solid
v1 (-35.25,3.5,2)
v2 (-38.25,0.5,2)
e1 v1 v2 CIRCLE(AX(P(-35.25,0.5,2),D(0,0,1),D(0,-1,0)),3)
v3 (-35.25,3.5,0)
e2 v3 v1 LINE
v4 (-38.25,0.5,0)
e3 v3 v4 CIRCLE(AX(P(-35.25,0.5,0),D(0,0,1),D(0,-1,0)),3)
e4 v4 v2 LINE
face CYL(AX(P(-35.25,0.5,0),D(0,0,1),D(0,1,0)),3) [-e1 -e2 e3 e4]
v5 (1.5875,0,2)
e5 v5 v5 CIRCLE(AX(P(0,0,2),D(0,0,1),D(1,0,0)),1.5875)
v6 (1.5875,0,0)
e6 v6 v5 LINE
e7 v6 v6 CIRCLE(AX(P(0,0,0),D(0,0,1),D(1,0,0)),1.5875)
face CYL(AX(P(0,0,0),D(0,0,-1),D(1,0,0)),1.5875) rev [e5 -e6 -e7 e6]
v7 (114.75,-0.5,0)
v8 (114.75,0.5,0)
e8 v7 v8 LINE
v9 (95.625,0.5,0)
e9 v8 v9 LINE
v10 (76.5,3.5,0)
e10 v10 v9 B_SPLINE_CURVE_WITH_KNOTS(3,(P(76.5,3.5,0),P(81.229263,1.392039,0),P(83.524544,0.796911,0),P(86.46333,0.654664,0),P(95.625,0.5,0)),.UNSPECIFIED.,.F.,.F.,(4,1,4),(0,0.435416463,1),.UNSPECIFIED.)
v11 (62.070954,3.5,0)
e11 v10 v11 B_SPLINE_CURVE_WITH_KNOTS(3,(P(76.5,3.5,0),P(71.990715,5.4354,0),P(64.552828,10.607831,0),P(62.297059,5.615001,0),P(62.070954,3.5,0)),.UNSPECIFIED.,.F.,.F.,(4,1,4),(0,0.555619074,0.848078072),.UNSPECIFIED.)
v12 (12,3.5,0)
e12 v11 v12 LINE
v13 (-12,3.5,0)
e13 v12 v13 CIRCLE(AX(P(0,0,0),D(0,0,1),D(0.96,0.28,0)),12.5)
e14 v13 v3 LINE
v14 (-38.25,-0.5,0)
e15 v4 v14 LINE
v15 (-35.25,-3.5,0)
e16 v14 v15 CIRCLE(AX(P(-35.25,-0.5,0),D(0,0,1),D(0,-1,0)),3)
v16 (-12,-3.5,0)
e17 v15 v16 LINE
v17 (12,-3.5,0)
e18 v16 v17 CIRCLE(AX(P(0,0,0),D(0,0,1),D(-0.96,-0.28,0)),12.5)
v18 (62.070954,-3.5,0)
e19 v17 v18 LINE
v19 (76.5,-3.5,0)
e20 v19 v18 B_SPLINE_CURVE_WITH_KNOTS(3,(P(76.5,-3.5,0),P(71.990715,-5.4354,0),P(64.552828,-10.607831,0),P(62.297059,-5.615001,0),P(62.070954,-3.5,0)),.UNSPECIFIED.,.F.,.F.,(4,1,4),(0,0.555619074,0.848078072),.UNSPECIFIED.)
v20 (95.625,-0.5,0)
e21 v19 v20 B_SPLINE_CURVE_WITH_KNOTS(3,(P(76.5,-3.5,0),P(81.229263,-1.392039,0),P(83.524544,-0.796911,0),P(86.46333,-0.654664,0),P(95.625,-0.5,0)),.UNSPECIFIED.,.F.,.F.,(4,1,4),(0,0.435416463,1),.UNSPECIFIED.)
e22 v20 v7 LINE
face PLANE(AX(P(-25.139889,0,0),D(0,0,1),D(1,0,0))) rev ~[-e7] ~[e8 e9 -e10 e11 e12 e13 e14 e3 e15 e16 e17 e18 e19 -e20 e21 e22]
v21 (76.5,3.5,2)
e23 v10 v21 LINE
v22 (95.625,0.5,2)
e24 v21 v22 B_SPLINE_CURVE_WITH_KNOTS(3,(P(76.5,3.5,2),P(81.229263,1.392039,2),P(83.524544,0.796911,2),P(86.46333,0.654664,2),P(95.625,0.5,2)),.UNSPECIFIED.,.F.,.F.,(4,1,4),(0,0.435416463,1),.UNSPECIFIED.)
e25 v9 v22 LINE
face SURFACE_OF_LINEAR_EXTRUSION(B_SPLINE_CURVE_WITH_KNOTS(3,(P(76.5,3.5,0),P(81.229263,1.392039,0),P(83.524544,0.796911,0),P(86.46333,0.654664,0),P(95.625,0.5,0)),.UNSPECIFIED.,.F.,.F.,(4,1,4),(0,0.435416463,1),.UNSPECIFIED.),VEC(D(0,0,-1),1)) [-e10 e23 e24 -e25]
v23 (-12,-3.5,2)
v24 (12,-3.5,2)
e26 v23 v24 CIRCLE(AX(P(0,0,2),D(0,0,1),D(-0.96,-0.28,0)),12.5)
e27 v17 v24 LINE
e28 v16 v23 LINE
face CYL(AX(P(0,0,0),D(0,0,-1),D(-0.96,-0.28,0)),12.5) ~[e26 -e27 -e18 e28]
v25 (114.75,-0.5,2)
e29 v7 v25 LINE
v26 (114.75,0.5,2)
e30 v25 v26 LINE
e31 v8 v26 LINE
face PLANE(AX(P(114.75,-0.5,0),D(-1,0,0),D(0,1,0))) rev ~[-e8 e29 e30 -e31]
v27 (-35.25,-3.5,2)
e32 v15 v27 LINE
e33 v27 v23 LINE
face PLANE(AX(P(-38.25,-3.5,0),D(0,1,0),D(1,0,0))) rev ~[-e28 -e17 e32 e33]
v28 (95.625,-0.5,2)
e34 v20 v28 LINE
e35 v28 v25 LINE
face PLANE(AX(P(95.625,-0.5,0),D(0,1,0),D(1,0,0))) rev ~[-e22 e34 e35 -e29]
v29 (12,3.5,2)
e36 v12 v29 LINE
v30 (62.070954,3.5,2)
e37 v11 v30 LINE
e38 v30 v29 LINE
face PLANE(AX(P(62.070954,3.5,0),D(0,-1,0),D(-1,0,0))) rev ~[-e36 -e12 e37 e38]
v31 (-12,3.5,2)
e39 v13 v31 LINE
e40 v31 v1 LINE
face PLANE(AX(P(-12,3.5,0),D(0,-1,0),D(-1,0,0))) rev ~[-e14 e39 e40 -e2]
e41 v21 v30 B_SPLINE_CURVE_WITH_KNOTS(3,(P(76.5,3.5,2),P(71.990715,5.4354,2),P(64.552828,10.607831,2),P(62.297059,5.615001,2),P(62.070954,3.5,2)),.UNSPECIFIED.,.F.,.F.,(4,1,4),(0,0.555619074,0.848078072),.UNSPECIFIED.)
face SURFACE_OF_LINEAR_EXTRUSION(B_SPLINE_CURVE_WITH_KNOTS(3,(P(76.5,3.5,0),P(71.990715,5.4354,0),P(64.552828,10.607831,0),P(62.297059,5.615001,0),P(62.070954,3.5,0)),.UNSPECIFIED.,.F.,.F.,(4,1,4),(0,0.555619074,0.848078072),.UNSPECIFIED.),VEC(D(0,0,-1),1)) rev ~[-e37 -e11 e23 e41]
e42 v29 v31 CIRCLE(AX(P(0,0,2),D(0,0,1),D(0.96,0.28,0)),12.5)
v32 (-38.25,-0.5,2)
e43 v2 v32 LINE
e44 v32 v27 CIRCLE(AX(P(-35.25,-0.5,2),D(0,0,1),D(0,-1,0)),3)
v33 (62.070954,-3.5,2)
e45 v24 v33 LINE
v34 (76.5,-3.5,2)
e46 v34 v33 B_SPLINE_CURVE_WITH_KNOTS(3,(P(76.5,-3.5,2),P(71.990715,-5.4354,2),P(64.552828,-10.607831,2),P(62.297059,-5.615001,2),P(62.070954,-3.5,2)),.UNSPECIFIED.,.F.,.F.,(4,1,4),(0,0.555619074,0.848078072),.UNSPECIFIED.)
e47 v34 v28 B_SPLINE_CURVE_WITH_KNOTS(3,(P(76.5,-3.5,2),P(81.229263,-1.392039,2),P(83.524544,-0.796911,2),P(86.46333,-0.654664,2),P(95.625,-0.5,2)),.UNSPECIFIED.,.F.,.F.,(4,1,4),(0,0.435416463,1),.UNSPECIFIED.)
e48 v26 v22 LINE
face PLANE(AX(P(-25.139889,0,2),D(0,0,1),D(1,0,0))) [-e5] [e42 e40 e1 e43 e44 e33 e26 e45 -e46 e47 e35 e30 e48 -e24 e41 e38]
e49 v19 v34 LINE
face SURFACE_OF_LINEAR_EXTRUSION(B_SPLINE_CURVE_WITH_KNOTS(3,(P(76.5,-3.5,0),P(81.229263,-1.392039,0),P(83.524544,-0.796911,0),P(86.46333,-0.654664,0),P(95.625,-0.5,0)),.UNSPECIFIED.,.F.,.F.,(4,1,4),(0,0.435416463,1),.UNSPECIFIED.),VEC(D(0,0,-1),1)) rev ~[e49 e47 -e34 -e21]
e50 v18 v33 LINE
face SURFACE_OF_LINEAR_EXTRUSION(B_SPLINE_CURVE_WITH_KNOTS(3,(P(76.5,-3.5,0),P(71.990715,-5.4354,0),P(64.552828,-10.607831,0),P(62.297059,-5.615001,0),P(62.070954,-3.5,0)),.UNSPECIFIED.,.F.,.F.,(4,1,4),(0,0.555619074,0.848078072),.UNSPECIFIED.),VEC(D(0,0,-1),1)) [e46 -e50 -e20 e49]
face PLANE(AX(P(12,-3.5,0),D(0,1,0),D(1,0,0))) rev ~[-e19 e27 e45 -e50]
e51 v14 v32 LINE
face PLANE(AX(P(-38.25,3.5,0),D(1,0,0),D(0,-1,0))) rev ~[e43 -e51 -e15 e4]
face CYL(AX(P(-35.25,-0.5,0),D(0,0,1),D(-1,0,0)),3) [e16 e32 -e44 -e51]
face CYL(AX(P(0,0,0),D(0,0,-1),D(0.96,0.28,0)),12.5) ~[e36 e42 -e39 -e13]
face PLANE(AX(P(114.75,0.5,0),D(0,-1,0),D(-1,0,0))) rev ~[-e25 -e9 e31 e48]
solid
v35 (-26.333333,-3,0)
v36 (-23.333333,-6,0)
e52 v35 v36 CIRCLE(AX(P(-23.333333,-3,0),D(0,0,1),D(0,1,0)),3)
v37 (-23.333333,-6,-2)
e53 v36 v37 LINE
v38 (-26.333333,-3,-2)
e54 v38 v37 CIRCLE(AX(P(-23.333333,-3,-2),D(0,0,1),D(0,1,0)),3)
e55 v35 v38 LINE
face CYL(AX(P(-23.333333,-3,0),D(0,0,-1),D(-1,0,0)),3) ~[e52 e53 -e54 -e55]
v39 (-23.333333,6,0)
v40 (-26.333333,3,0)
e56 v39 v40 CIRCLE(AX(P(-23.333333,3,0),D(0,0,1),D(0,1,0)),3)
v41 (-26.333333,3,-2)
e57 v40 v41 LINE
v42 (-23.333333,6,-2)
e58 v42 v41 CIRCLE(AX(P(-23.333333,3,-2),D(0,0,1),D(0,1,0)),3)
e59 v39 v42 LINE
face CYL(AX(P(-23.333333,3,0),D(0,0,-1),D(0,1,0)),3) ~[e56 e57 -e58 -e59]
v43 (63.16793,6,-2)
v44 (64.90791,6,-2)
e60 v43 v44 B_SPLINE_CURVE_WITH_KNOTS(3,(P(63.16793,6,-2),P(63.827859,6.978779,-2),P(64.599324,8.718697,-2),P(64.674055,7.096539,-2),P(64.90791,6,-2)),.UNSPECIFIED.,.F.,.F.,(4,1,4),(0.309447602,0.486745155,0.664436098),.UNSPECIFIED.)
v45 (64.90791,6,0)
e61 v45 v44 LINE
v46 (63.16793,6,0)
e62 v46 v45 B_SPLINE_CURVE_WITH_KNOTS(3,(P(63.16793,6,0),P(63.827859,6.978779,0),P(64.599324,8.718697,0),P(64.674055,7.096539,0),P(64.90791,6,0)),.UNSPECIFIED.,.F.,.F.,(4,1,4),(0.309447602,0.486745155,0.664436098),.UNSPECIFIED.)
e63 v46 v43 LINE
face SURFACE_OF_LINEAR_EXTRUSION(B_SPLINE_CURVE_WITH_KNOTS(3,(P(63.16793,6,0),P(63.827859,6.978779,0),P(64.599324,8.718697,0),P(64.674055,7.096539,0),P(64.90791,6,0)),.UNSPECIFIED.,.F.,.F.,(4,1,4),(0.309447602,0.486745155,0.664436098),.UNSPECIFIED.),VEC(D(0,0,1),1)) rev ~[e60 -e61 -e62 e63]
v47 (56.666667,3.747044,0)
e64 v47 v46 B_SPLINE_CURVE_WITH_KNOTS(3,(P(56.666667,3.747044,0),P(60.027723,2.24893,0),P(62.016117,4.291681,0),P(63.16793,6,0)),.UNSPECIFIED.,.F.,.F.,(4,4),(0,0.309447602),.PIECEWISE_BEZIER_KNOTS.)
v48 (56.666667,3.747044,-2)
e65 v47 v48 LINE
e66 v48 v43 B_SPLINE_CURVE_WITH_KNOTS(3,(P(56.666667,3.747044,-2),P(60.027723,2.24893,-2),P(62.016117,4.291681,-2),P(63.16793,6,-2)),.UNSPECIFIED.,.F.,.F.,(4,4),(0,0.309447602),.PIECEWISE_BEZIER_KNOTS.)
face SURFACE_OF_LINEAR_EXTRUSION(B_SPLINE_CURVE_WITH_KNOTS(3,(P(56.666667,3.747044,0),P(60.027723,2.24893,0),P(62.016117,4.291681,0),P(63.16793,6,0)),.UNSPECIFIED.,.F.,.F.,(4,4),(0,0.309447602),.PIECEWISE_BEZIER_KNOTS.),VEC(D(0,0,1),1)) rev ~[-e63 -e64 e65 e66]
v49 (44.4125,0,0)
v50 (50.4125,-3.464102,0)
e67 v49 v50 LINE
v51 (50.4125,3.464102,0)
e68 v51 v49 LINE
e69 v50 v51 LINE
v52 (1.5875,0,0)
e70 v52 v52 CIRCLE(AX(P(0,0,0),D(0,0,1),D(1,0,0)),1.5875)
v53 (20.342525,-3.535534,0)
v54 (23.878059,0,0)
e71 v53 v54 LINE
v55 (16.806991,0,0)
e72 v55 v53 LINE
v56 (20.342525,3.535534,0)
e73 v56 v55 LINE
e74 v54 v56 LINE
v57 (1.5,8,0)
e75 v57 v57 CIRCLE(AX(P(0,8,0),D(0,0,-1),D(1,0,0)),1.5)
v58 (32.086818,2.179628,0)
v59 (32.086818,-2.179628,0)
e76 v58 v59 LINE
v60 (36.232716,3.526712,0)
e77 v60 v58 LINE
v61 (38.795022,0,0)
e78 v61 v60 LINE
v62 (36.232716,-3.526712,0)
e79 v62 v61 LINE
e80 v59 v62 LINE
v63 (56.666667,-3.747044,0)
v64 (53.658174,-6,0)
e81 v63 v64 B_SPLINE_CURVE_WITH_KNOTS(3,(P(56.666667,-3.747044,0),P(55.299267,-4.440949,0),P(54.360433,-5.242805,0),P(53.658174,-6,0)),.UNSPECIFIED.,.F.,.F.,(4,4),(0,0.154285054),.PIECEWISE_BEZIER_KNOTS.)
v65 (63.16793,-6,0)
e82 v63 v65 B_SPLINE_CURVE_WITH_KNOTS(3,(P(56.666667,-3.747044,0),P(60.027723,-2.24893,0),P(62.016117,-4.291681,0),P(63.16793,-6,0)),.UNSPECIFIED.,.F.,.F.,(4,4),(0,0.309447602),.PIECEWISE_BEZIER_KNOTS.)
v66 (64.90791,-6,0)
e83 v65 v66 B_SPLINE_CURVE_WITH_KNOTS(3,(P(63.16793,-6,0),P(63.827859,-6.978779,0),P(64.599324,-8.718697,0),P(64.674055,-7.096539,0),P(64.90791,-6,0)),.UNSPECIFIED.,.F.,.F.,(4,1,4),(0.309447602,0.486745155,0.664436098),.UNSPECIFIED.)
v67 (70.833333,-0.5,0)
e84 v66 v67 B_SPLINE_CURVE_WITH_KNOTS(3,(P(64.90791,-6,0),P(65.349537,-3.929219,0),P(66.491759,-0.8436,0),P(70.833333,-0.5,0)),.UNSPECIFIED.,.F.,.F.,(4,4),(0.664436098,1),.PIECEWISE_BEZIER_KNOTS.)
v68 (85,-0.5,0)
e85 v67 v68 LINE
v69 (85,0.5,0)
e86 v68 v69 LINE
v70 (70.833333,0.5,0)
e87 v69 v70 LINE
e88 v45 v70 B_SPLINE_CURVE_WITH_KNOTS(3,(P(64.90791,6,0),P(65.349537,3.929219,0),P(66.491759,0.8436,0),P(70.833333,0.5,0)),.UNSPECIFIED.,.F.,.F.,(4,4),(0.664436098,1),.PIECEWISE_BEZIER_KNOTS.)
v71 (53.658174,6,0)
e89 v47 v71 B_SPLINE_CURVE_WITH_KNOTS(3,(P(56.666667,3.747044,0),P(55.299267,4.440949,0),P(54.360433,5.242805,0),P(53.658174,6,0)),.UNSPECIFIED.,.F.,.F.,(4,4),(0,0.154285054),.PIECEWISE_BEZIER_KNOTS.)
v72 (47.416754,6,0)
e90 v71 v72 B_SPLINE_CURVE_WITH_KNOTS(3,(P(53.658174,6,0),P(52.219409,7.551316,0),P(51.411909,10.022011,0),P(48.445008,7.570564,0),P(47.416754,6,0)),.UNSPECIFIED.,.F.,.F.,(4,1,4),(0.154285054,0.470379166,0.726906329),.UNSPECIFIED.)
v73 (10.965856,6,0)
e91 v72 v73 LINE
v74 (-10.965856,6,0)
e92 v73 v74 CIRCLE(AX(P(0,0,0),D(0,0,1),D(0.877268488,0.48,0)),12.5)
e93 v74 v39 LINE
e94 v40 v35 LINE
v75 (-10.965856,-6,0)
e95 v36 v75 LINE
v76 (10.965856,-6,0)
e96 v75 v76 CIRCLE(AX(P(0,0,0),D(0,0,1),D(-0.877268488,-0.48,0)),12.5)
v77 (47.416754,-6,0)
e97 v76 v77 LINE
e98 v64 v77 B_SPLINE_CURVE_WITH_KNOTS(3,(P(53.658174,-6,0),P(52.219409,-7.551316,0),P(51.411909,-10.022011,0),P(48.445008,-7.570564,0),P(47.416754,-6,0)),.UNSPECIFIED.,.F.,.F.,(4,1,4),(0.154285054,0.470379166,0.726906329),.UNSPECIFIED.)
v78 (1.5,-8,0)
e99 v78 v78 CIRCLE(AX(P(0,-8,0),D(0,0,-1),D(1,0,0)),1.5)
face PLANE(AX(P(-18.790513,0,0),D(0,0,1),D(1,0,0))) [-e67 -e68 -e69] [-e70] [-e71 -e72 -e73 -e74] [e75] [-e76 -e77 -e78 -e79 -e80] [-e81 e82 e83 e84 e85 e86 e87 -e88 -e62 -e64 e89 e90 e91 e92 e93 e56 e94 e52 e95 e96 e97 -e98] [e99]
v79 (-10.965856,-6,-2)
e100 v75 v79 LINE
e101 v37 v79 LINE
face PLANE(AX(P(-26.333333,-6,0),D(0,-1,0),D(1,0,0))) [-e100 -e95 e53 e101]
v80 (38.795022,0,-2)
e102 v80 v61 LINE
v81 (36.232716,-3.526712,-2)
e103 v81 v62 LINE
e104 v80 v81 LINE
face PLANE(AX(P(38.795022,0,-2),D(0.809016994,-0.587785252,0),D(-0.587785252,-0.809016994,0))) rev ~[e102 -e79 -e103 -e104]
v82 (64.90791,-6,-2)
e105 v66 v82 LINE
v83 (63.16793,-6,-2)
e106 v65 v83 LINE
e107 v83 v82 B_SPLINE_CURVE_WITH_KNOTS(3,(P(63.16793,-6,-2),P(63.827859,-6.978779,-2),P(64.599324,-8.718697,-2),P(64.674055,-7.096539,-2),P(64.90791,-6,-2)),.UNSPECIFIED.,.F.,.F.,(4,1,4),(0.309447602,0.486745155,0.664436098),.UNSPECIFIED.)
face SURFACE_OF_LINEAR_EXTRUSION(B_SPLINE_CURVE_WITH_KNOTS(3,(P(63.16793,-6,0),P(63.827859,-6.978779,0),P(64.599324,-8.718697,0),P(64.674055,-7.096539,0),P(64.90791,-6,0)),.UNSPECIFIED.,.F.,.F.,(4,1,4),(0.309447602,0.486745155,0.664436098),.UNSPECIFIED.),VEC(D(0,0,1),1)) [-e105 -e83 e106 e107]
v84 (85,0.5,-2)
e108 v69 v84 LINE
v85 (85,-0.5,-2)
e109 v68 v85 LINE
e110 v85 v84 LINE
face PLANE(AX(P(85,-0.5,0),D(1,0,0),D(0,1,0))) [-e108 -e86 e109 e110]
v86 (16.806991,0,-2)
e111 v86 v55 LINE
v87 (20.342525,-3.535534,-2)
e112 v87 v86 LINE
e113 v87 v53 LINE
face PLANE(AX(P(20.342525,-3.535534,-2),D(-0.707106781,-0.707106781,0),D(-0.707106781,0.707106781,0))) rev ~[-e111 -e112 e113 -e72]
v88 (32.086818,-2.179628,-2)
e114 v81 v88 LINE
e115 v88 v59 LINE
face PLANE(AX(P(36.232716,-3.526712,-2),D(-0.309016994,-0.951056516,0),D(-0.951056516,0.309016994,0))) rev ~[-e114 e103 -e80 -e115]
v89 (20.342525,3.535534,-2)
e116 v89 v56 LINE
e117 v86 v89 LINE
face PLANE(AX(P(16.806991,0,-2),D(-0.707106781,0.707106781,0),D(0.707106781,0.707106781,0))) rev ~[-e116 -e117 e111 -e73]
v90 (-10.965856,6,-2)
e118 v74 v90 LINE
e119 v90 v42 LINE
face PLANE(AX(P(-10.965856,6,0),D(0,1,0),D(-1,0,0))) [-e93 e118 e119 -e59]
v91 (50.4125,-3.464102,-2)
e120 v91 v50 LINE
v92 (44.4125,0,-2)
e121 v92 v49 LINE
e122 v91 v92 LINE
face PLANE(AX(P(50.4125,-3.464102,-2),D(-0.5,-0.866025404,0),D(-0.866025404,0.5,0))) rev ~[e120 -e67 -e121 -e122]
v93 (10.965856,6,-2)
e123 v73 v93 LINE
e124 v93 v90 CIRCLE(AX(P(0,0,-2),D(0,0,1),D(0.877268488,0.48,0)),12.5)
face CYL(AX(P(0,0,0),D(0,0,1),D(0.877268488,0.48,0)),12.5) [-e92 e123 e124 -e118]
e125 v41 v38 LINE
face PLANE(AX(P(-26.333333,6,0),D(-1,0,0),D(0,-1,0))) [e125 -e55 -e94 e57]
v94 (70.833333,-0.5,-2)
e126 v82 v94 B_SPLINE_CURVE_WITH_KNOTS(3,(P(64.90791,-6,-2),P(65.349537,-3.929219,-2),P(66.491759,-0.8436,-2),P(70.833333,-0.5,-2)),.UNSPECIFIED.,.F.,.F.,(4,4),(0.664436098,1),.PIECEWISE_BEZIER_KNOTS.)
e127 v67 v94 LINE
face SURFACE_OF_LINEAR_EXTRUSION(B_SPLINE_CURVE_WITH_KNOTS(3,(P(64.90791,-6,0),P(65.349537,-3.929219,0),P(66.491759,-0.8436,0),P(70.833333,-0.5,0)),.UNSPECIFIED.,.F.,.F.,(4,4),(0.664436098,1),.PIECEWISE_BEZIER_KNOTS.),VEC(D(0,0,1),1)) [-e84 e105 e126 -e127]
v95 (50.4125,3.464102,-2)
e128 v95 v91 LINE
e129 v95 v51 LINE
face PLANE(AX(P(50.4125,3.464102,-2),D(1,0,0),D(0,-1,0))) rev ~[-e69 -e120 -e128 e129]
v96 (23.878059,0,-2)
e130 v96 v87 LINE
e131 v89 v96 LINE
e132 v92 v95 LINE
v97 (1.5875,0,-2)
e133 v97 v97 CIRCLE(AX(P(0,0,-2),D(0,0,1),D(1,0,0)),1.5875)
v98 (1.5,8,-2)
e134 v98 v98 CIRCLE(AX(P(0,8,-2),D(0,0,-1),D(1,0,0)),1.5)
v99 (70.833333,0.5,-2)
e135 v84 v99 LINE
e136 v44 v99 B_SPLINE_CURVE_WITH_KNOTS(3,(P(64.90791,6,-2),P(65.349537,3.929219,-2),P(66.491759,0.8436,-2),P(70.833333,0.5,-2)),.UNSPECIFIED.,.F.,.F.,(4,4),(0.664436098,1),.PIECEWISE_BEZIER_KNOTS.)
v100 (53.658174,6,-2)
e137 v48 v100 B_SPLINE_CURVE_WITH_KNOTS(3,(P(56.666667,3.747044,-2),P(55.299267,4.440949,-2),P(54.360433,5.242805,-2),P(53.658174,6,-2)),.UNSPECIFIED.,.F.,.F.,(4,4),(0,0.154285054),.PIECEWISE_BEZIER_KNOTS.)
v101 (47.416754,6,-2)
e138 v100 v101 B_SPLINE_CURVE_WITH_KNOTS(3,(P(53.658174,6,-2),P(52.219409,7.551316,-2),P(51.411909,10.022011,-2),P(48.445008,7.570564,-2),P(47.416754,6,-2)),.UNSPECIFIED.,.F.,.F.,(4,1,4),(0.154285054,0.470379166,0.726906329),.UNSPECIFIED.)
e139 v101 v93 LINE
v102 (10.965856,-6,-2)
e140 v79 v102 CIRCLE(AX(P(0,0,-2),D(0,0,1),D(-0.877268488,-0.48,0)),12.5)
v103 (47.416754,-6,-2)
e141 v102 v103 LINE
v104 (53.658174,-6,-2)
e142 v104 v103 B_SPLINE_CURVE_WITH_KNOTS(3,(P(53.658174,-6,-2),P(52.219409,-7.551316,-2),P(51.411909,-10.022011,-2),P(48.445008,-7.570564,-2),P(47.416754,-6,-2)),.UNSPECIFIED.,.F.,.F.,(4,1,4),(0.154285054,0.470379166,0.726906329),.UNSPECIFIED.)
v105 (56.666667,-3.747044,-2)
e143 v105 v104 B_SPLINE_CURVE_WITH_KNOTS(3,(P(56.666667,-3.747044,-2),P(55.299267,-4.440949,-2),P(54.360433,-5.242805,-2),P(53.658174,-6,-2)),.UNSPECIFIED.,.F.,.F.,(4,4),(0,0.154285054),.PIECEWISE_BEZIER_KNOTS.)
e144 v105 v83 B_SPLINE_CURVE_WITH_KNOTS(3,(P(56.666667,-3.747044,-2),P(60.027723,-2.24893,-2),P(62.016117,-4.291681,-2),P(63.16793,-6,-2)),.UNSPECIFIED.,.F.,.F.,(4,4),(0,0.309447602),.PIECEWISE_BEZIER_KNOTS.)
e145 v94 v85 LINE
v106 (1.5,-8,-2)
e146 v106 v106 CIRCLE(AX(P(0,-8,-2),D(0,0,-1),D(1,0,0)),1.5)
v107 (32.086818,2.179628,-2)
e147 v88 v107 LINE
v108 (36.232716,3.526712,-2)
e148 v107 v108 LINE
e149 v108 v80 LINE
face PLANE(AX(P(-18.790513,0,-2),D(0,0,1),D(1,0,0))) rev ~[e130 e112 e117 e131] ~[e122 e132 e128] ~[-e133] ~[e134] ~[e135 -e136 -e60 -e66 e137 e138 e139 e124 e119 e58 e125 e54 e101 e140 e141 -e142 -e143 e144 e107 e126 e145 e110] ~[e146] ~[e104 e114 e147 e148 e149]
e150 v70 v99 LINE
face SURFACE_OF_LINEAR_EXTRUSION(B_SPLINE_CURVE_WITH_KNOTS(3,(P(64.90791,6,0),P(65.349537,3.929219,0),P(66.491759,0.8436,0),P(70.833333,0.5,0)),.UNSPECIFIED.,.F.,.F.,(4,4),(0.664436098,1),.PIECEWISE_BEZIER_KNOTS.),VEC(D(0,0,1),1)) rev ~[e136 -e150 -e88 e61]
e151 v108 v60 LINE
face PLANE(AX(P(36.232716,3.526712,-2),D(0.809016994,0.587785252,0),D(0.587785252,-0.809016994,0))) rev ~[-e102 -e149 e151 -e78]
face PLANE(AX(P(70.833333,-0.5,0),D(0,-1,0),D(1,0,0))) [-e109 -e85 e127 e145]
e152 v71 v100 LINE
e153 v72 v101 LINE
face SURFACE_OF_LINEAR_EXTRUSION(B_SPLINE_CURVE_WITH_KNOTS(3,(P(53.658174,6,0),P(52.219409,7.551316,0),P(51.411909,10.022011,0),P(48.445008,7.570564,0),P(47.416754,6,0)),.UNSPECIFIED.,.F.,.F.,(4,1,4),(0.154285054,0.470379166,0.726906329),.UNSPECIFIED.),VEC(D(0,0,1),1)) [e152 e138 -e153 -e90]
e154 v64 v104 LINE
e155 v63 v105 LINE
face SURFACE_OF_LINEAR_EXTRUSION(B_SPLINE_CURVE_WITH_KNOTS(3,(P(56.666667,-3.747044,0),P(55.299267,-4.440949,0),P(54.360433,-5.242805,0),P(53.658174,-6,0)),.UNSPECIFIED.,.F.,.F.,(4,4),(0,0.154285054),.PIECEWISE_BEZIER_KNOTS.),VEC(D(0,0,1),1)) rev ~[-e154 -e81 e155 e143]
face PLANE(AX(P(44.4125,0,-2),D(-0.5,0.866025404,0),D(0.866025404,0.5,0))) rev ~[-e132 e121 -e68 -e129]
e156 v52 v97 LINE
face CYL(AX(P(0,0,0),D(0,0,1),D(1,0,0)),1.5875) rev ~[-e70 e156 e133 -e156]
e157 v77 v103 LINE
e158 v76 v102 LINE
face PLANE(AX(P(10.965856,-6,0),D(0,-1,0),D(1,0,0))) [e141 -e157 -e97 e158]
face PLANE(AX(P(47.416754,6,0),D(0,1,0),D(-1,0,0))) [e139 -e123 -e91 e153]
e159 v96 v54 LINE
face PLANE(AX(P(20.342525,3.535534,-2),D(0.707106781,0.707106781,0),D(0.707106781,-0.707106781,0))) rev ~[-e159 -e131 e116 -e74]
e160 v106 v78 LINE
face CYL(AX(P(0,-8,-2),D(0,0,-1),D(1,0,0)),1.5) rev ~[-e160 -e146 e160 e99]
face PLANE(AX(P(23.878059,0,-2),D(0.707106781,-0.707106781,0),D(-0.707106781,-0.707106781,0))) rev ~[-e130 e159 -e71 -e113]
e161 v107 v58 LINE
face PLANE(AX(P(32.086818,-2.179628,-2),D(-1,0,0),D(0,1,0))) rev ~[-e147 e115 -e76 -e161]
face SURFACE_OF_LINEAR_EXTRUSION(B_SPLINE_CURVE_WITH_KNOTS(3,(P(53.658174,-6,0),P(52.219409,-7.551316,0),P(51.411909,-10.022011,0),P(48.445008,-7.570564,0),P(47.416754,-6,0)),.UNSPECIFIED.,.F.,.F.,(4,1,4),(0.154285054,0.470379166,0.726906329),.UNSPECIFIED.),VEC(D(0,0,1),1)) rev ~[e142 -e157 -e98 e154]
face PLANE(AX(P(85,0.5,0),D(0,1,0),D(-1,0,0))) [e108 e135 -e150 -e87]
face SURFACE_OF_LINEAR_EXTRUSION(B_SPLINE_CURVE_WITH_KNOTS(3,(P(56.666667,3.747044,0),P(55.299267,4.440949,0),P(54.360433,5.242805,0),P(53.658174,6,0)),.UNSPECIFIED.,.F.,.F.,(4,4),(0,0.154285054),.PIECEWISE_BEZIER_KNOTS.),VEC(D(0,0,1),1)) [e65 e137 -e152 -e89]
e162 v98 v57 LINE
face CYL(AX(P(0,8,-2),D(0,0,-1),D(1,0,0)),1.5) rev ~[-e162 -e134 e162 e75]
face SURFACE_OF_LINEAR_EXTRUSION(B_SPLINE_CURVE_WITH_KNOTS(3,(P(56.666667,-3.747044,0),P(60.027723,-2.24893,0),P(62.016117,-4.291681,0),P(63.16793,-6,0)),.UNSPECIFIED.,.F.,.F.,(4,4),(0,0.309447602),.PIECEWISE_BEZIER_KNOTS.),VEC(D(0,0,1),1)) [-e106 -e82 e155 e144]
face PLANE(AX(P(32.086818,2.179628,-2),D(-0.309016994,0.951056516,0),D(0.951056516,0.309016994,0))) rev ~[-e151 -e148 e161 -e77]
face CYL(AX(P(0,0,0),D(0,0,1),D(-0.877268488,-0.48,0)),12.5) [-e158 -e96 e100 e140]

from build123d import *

# Parameters (mm, degrees)
F0_R     = 1.5875
F1_DEPTH = 2
F2_R     = 1.5875
F3_DEPTH = 2
F4_R     = 3
F4_2_R   = 3
F6_DEPTH = 25
F7_R     = 1.5
F8_DEPTH = 25


with BuildPart() as f1:
    # F0 (on Top) → F1 (new body)
    with BuildSketch(Plane.XY):
        with BuildLine():
            ThreePointArc((-12, -3.5), (-12.5, 0), (-12, 3.5))
            Line((-12, 3.5), (-38.25, 3.5))
            Line((-38.25, 3.5), (-38.25, -3.5))
            Line((-38.25, -3.5), (-12, -3.5))
        make_face()
        with BuildLine():
            Line((-12, 3.5), (12, 3.5))
            ThreePointArc((12, 3.5), (0, 12.5), (-12, 3.5))
        make_face()
        with BuildLine():
            Line((62.0709539045, 3.5), (76.5, 3.5))
            add(Edge.make_bspline(
                [(76.5, 3.5), (71.9907153616, 5.4354000871), (64.55282786, 10.6078306891), (62.2970592122, 5.6150011273), (62.0709539045, 3.5)],
                knots=[0, 0, 0, 0, 0.5556190741, 0.8480780717, 0.8480780717, 0.8480780717, 0.8480780717], degree=3))
        make_face()
        with BuildLine():
            Line((12, -3.5), (-12, -3.5))
            ThreePointArc((-12, -3.5), (0, -12.5), (12, -3.5))
        make_face()
        with BuildLine():
            Line((76.5, -3.5), (62.0709539045, -3.5))
            add(Edge.make_bspline(
                [(76.5, -3.5), (71.9907153616, -5.4354000871), (64.55282786, -10.6078306891), (62.2970592122, -5.6150011273), (62.0709539045, -3.5)],
                knots=[0, 0, 0, 0, 0.5556190741, 0.8480780717, 0.8480780717, 0.8480780717, 0.8480780717], degree=3))
        make_face()
        with BuildLine():
            add(Edge.make_bspline(
                [(62.0709539045, 3.5), (61.9535003312, 2.401333), (61.9849445935, 1.196556193), (62.15625, 0)],
                knots=[0.8480780717, 0.8480780717, 0.8480780717, 0.8480780717, 1, 1, 1, 1], degree=3))
            Line((62.0709539045, 3.5), (12, 3.5))
            ThreePointArc((12, 3.5), (12.3743686708, 1.767766953), (12.5, 0))
            ThreePointArc((12.5, 0), (12.3743686708, -1.767766953), (12, -3.5))
            Line((12, -3.5), (62.0709539045, -3.5))
            add(Edge.make_bspline(
                [(62.0709539045, -3.5), (61.9535003312, -2.401333), (61.9849445935, -1.196556193), (62.15625, 0)],
                knots=[0.8480780717, 0.8480780717, 0.8480780717, 0.8480780717, 1, 1, 1, 1], degree=3))
        make_face()
        with BuildLine():
            ThreePointArc((12.5, 0), (12.3743686708, 1.767766953), (12, 3.5))
            Line((12, 3.5), (-12, 3.5))
            ThreePointArc((-12, 3.5), (-12.5, 0), (-12, -3.5))
            Line((-12, -3.5), (12, -3.5))
            ThreePointArc((12, -3.5), (12.3743686708, -1.767766953), (12.5, 0))
        make_face()
        Circle(F0_R, mode=Mode.SUBTRACT)
        with BuildLine():
            add(Edge.make_bspline(
                [(76.5, 3.5), (81.2292632272, 1.3920385639), (83.5245438479, 0.7969108606), (86.4633302777, 0.6546642008), (95.625, 0.5)],
                knots=[0, 0, 0, 0, 0.4354164629, 1, 1, 1, 1], degree=3))
            Line((76.5, 3.5), (62.0709539045, 3.5))
            add(Edge.make_bspline(
                [(62.0709539045, 3.5), (61.9535003312, 2.401333), (61.9849445935, 1.196556193), (62.15625, 0)],
                knots=[0.8480780717, 0.8480780717, 0.8480780717, 0.8480780717, 1, 1, 1, 1], degree=3))
            add(Edge.make_bspline(
                [(62.0709539045, -3.5), (61.9535003312, -2.401333), (61.9849445935, -1.196556193), (62.15625, 0)],
                knots=[0.8480780717, 0.8480780717, 0.8480780717, 0.8480780717, 1, 1, 1, 1], degree=3))
            Line((62.0709539045, -3.5), (76.5, -3.5))
            add(Edge.make_bspline(
                [(76.5, -3.5), (81.2292632272, -1.3920385639), (83.5245438479, -0.7969108606), (86.4633302777, -0.6546642008), (95.625, -0.5)],
                knots=[0, 0, 0, 0, 0.4354164629, 1, 1, 1, 1], degree=3))
            Line((95.625, -0.5), (114.75, -0.5))
            Line((114.75, -0.5), (114.75, 0.5))
            Line((114.75, 0.5), (95.625, 0.5))
        make_face()
    extrude(amount=F1_DEPTH)

    # F4
    f4_edges = [f1.edges().sort_by_distance(p)[0] for p in [
        (-38.25, 3.5, 1),
        (-38.25, -3.5, 1),
    ]]
    fillet(f4_edges, radius=F4_R)


with BuildPart() as f3:
    # F2 (on Top) → F3 (new body)
    with BuildSketch(Plane.XY):
        with BuildLine():
            Line((-10.9658560997, 6), (-26.33333333, 6))
            Line((-26.33333333, 6), (-26.33333333, -6))
            Line((-26.33333333, -6), (-10.9658560997, -6))
            ThreePointArc((-10.9658560997, -6), (-12.5, 0), (-10.9658560997, 6))
        make_face()
        with BuildLine():
            ThreePointArc((10.9658560997, 6), (0, 12.5), (-10.9658560997, 6))
            Line((-10.9658560997, 6), (10.9658560997, 6))
        make_face()
        with BuildLine():
            Line((10.9658560997, -6), (-10.9658560997, -6))
            ThreePointArc((-10.9658560997, -6), (0, -12.5), (10.9658560997, -6))
        make_face()
        with BuildLine():
            Line((53.6581738244, 6), (47.4167542526, 6))
            add(Edge.make_bspline(
                [(47.4167542526, 6), (46.3220957553, 4.3280086445), (45.5684344657, 2.1206918096), (46.0416666667, 0)],
                knots=[0.726906329, 0.726906329, 0.726906329, 0.726906329, 1, 1, 1, 1], degree=3))
            add(Edge.make_bspline(
                [(47.4167542526, -6), (46.3220957553, -4.3280086445), (45.5684344657, -2.1206918096), (46.0416666667, 0)],
                knots=[0.726906329, 0.726906329, 0.726906329, 0.726906329, 1, 1, 1, 1], degree=3))
            Line((47.4167542526, -6), (53.6581738244, -6))
            add(Edge.make_bspline(
                [(56.6666666667, -3.747044364), (55.2992674084, -4.4409490289), (54.3604326541, -5.2428049781), (53.6581738244, -6)],
                knots=[0, 0, 0, 0, 0.1542850544, 0.1542850544, 0.1542850544, 0.1542850544], degree=3))
            add(Edge.make_bspline(
                [(56.6666666667, -3.747044364), (60.0277227864, -2.2489301029), (62.0161168237, -4.2916810168), (63.1679295713, -6)],
                knots=[0, 0, 0, 0, 0.3094476025, 0.3094476025, 0.3094476025, 0.3094476025], degree=3))
            Line((63.1679295713, -6), (64.907909688, -6))
            add(Edge.make_bspline(
                [(64.907909688, -6), (65.3495372223, -3.9292189456), (66.4917594583, -0.8436001546), (70.8333333333, -0.5)],
                knots=[0.6644360976, 0.6644360976, 0.6644360976, 0.6644360976, 1, 1, 1, 1], degree=3))
            Line((70.8333333333, -0.5), (85, -0.5))
            Line((85, -0.5), (85, 0.5))
            Line((85, 0.5), (70.8333333333, 0.5))
            add(Edge.make_bspline(
                [(64.907909688, 6), (65.3495372223, 3.9292189456), (66.4917594583, 0.8436001546), (70.8333333333, 0.5)],
                knots=[0.6644360976, 0.6644360976, 0.6644360976, 0.6644360976, 1, 1, 1, 1], degree=3))
            Line((64.907909688, 6), (63.1679295713, 6))
            add(Edge.make_bspline(
                [(56.6666666667, 3.747044364), (60.0277227864, 2.2489301029), (62.0161168237, 4.2916810168), (63.1679295713, 6)],
                knots=[0, 0, 0, 0, 0.3094476025, 0.3094476025, 0.3094476025, 0.3094476025], degree=3))
            add(Edge.make_bspline(
                [(56.6666666667, 3.747044364), (55.2992674084, 4.4409490289), (54.3604326541, 5.2428049781), (53.6581738244, 6)],
                knots=[0, 0, 0, 0, 0.1542850544, 0.1542850544, 0.1542850544, 0.1542850544], degree=3))
        make_face()
        with BuildLine():
            Line((47.4167542526, 6), (10.9658560997, 6))
            ThreePointArc((10.9658560997, 6), (12.1103922572, 3.0965140685), (12.5, 0))
            ThreePointArc((12.5, 0), (12.1103922572, -3.0965140685), (10.9658560997, -6))
            Line((10.9658560997, -6), (47.4167542526, -6))
            add(Edge.make_bspline(
                [(47.4167542526, -6), (46.3220957553, -4.3280086445), (45.5684344657, -2.1206918096), (46.0416666667, 0)],
                knots=[0.726906329, 0.726906329, 0.726906329, 0.726906329, 1, 1, 1, 1], degree=3))
            add(Edge.make_bspline(
                [(47.4167542526, 6), (46.3220957553, 4.3280086445), (45.5684344657, 2.1206918096), (46.0416666667, 0)],
                knots=[0.726906329, 0.726906329, 0.726906329, 0.726906329, 1, 1, 1, 1], degree=3))
        make_face()
        with BuildLine():
            Line((10.9658560997, 6), (-10.9658560997, 6))
            ThreePointArc((-10.9658560997, 6), (-12.5, 0), (-10.9658560997, -6))
            Line((-10.9658560997, -6), (10.9658560997, -6))
            ThreePointArc((10.9658560997, -6), (12.1103922572, -3.0965140685), (12.5, 0))
            ThreePointArc((12.5, 0), (12.1103922572, 3.0965140685), (10.9658560997, 6))
        make_face()
        Circle(F2_R, mode=Mode.SUBTRACT)
        with BuildLine():
            Line((64.907909688, -6), (63.1679295713, -6))
            add(Edge.make_bspline(
                [(63.1679295713, -6), (63.8278590037, -6.9787788677), (64.5993236597, -8.718696784), (64.6740549365, -7.0965393941), (64.907909688, -6)],
                knots=[0.3094476025, 0.3094476025, 0.3094476025, 0.3094476025, 0.4867451547, 0.6644360976, 0.6644360976, 0.6644360976, 0.6644360976], degree=3))
        make_face()
        with BuildLine():
            add(Edge.make_bspline(
                [(63.1679295713, 6), (63.8278590037, 6.9787788677), (64.5993236597, 8.718696784), (64.6740549365, 7.0965393941), (64.907909688, 6)],
                knots=[0.3094476025, 0.3094476025, 0.3094476025, 0.3094476025, 0.4867451547, 0.6644360976, 0.6644360976, 0.6644360976, 0.6644360976], degree=3))
            Line((63.1679295713, 6), (64.907909688, 6))
        make_face()
        with BuildLine():
            add(Edge.make_bspline(
                [(53.6581738244, 6), (52.2194091826, 7.5513160935), (51.4119093355, 10.0220105563), (48.4450081755, 7.5705644038), (47.4167542526, 6)],
                knots=[0.1542850544, 0.1542850544, 0.1542850544, 0.1542850544, 0.4703791662, 0.726906329, 0.726906329, 0.726906329, 0.726906329], degree=3))
            Line((47.4167542526, 6), (53.6581738244, 6))
        make_face()
        with BuildLine():
            Line((53.6581738244, -6), (47.4167542526, -6))
            add(Edge.make_bspline(
                [(53.6581738244, -6), (52.2194091826, -7.5513160935), (51.4119093355, -10.0220105563), (48.4450081755, -7.5705644038), (47.4167542526, -6)],
                knots=[0.1542850544, 0.1542850544, 0.1542850544, 0.1542850544, 0.4703791662, 0.726906329, 0.726906329, 0.726906329, 0.726906329], degree=3))
        make_face()
    extrude(amount=-F3_DEPTH)

    # F4#2
    f4_2_edges = [f3.edges().sort_by_distance(p)[0] for p in [
        (-26.333333, 6, -1),
        (-26.333333, -6, -1),
    ]]
    fillet(f4_2_edges, radius=F4_2_R)

    # F5 (on face) → F6 (cut)
    with BuildSketch(Plane(origin=(0, 0, -2), x_dir=(1, 0, 0), z_dir=(0, 0, -1))):
        Polygon((44.4125, 0), (50.4125, -3.4641016151), (50.4125, 3.4641016151), align=None)
        Polygon((36.2327160732, -3.5267115138), (38.7950219719, 0), (36.2327160732, 3.5267115138), (32.0868180394, 2.179627584), (32.0868180394, -2.179627584), align=None)
        Polygon((20.3425250947, -3.5355339059), (23.8780590007, 0), (20.3425250947, 3.5355339059), (16.8069911888, 0), align=None)
    extrude(amount=-F6_DEPTH, mode=Mode.SUBTRACT)

    # F7 (on face) → F8 (cut)
    with BuildSketch(Plane(origin=(0, 0, -2), x_dir=(1, 0, 0), z_dir=(0, 0, -1))):
        with Locations((0, 8)):
            Circle(F7_R)
        with Locations((0, -8)):
            Circle(F7_R)
    extrude(amount=-F8_DEPTH, mode=Mode.SUBTRACT)


solid = Compound([f1.part, f3.part])
